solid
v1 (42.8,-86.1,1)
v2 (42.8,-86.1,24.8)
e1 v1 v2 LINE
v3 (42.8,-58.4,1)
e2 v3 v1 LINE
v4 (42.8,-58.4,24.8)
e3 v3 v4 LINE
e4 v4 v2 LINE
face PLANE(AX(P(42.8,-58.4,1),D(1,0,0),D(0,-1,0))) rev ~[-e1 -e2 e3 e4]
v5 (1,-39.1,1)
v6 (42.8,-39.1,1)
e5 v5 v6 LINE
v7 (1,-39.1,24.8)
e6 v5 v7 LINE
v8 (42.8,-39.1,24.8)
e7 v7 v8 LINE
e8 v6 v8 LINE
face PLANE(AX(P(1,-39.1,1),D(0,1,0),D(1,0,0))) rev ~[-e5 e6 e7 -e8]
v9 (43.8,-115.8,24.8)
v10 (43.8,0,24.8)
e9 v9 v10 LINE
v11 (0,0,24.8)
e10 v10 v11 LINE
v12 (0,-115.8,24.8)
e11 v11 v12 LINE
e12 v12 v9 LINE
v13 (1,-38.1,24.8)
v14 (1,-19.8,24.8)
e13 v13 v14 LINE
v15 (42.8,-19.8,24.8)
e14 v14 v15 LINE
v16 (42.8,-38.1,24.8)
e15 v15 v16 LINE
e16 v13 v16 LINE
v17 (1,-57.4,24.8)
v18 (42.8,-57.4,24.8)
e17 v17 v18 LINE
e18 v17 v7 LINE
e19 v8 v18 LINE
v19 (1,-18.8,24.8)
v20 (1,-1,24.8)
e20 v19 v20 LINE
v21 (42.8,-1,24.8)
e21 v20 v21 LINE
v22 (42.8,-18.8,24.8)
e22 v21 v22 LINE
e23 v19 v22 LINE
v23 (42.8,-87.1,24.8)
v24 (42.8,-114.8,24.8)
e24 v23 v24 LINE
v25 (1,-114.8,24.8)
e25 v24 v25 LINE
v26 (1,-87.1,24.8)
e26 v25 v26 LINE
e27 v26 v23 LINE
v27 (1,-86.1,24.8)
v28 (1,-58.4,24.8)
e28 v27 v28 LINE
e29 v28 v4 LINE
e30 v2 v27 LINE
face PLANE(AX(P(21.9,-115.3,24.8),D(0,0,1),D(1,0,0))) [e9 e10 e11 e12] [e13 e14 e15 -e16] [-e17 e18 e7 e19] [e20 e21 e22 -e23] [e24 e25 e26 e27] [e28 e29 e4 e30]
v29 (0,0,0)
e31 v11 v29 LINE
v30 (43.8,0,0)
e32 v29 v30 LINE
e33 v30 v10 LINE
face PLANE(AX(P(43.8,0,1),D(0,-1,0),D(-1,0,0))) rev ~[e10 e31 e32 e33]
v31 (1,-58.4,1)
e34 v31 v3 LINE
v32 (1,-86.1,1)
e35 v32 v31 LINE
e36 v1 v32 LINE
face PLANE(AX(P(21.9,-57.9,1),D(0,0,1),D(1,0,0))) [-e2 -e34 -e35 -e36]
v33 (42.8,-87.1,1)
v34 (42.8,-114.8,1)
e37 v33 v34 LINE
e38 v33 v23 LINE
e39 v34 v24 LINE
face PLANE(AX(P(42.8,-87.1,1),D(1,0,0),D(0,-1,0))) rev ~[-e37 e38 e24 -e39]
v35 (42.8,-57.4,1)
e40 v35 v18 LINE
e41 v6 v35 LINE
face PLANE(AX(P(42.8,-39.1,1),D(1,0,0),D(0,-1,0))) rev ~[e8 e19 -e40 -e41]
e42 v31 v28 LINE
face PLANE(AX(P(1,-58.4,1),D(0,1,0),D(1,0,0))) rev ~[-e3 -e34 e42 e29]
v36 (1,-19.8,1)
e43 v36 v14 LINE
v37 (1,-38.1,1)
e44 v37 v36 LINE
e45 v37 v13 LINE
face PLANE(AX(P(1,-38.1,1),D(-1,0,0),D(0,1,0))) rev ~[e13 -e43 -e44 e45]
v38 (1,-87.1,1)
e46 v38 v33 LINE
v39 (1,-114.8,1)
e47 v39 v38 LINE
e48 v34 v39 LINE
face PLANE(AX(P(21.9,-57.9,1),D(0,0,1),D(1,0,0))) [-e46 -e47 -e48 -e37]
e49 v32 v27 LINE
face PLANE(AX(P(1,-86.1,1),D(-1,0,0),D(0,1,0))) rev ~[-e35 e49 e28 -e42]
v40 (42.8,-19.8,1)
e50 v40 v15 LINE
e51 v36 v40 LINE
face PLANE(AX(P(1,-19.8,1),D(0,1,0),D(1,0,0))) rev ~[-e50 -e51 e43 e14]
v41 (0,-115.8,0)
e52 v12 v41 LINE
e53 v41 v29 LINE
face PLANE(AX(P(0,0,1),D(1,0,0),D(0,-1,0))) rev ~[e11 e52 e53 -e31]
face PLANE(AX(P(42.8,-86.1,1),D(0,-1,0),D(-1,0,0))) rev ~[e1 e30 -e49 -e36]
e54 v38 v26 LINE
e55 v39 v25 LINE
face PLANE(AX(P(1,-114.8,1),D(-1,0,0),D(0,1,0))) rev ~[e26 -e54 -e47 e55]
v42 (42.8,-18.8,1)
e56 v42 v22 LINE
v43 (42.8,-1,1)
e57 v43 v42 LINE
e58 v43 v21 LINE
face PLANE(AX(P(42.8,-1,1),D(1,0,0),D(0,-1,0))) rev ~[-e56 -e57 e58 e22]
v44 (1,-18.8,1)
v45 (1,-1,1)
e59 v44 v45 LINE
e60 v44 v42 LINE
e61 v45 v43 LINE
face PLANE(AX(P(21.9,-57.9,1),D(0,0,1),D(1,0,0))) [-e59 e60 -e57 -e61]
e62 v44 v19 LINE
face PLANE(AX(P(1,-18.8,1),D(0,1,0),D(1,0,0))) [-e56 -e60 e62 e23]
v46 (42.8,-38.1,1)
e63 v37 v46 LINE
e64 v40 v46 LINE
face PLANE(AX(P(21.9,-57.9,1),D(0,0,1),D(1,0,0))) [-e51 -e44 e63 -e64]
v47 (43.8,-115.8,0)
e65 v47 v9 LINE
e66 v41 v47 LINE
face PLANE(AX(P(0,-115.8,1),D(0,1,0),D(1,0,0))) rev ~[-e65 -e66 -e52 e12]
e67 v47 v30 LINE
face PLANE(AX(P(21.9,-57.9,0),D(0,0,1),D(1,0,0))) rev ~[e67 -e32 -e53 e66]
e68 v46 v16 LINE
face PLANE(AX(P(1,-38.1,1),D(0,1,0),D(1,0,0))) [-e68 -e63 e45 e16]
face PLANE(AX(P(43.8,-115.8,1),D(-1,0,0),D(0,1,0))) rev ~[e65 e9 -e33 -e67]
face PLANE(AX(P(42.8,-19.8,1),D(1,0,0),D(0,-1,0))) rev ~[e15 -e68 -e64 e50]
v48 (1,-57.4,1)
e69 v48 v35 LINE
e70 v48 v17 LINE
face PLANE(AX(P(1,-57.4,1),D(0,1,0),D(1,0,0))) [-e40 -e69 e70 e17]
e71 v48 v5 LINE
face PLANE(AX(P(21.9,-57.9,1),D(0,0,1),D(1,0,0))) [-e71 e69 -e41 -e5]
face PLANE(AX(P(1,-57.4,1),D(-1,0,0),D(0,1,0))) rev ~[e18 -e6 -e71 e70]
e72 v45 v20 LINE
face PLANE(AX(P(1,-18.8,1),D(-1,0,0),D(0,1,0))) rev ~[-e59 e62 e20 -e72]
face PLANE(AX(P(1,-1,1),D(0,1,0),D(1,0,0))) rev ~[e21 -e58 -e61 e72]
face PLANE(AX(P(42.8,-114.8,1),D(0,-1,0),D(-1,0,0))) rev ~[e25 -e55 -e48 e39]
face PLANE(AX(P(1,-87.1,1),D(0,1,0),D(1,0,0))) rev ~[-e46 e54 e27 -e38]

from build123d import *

# Parameters (mm, degrees)
F0_W     = 43.8
F0_H     = 115.8
F1_DEPTH = 1
F2_W     = 41.8
F2_H     = 1
F3_DEPTH = 23.8


# Not quite as in the source:
# - a feature names something its author has since deleted; it is built from what else it names


with BuildPart() as f1:
    # F0 (on Top) → F1 (new body)
    with BuildSketch(Plane.XY):
        with Locations((21.9, -57.9)):
            Rectangle(F0_W, F0_H)
    extrude(amount=F1_DEPTH)

    # F2 (on face) → F3 (join)
    with BuildSketch(Plane.XY.offset(1)):
        Polygon((0, -114.8), (0, -115.8), (43.8, -115.8), (43.8, -114.8), (42.8, -114.8), (1, -114.8), align=None)
        Polygon((0, 0), (0, -114.8), (1, -114.8), (1, -87.35), (1, -87.1), (1, -86.35), (1, -86.1), (1, -58.4), (1, -57.4), (1, -39.1), (1, -38.1), (1, -19.8), (1, -18.8), (1, -1), (1, 0), align=None)
        Polygon((42.8, -114.8), (43.8, -114.8), (43.8, 0), (42.8, 0), (42.8, -1), (42.8, -18.8), (42.8, -19.8), (42.8, -38.1), (42.8, -39.1), (42.8, -57.4), (42.8, -58.4), (42.8, -86.1), (42.8, -87.1), align=None)
        with Locations((21.9, -0.5)):
            Rectangle(F2_W, F2_H)
        with Locations((21.9, -19.3)):
            Rectangle(F2_W, F2_H)
        with Locations((21.9, -38.6)):
            Rectangle(F2_W, F2_H)
        with Locations((21.9, -57.9)):
            Rectangle(F2_W, F2_H)
        Polygon((1, -87.1), (42.8, -87.1), (42.8, -86.1), (1, -86.1), (1, -86.35), align=None)
    extrude(amount=F3_DEPTH)


solid = f1.part
